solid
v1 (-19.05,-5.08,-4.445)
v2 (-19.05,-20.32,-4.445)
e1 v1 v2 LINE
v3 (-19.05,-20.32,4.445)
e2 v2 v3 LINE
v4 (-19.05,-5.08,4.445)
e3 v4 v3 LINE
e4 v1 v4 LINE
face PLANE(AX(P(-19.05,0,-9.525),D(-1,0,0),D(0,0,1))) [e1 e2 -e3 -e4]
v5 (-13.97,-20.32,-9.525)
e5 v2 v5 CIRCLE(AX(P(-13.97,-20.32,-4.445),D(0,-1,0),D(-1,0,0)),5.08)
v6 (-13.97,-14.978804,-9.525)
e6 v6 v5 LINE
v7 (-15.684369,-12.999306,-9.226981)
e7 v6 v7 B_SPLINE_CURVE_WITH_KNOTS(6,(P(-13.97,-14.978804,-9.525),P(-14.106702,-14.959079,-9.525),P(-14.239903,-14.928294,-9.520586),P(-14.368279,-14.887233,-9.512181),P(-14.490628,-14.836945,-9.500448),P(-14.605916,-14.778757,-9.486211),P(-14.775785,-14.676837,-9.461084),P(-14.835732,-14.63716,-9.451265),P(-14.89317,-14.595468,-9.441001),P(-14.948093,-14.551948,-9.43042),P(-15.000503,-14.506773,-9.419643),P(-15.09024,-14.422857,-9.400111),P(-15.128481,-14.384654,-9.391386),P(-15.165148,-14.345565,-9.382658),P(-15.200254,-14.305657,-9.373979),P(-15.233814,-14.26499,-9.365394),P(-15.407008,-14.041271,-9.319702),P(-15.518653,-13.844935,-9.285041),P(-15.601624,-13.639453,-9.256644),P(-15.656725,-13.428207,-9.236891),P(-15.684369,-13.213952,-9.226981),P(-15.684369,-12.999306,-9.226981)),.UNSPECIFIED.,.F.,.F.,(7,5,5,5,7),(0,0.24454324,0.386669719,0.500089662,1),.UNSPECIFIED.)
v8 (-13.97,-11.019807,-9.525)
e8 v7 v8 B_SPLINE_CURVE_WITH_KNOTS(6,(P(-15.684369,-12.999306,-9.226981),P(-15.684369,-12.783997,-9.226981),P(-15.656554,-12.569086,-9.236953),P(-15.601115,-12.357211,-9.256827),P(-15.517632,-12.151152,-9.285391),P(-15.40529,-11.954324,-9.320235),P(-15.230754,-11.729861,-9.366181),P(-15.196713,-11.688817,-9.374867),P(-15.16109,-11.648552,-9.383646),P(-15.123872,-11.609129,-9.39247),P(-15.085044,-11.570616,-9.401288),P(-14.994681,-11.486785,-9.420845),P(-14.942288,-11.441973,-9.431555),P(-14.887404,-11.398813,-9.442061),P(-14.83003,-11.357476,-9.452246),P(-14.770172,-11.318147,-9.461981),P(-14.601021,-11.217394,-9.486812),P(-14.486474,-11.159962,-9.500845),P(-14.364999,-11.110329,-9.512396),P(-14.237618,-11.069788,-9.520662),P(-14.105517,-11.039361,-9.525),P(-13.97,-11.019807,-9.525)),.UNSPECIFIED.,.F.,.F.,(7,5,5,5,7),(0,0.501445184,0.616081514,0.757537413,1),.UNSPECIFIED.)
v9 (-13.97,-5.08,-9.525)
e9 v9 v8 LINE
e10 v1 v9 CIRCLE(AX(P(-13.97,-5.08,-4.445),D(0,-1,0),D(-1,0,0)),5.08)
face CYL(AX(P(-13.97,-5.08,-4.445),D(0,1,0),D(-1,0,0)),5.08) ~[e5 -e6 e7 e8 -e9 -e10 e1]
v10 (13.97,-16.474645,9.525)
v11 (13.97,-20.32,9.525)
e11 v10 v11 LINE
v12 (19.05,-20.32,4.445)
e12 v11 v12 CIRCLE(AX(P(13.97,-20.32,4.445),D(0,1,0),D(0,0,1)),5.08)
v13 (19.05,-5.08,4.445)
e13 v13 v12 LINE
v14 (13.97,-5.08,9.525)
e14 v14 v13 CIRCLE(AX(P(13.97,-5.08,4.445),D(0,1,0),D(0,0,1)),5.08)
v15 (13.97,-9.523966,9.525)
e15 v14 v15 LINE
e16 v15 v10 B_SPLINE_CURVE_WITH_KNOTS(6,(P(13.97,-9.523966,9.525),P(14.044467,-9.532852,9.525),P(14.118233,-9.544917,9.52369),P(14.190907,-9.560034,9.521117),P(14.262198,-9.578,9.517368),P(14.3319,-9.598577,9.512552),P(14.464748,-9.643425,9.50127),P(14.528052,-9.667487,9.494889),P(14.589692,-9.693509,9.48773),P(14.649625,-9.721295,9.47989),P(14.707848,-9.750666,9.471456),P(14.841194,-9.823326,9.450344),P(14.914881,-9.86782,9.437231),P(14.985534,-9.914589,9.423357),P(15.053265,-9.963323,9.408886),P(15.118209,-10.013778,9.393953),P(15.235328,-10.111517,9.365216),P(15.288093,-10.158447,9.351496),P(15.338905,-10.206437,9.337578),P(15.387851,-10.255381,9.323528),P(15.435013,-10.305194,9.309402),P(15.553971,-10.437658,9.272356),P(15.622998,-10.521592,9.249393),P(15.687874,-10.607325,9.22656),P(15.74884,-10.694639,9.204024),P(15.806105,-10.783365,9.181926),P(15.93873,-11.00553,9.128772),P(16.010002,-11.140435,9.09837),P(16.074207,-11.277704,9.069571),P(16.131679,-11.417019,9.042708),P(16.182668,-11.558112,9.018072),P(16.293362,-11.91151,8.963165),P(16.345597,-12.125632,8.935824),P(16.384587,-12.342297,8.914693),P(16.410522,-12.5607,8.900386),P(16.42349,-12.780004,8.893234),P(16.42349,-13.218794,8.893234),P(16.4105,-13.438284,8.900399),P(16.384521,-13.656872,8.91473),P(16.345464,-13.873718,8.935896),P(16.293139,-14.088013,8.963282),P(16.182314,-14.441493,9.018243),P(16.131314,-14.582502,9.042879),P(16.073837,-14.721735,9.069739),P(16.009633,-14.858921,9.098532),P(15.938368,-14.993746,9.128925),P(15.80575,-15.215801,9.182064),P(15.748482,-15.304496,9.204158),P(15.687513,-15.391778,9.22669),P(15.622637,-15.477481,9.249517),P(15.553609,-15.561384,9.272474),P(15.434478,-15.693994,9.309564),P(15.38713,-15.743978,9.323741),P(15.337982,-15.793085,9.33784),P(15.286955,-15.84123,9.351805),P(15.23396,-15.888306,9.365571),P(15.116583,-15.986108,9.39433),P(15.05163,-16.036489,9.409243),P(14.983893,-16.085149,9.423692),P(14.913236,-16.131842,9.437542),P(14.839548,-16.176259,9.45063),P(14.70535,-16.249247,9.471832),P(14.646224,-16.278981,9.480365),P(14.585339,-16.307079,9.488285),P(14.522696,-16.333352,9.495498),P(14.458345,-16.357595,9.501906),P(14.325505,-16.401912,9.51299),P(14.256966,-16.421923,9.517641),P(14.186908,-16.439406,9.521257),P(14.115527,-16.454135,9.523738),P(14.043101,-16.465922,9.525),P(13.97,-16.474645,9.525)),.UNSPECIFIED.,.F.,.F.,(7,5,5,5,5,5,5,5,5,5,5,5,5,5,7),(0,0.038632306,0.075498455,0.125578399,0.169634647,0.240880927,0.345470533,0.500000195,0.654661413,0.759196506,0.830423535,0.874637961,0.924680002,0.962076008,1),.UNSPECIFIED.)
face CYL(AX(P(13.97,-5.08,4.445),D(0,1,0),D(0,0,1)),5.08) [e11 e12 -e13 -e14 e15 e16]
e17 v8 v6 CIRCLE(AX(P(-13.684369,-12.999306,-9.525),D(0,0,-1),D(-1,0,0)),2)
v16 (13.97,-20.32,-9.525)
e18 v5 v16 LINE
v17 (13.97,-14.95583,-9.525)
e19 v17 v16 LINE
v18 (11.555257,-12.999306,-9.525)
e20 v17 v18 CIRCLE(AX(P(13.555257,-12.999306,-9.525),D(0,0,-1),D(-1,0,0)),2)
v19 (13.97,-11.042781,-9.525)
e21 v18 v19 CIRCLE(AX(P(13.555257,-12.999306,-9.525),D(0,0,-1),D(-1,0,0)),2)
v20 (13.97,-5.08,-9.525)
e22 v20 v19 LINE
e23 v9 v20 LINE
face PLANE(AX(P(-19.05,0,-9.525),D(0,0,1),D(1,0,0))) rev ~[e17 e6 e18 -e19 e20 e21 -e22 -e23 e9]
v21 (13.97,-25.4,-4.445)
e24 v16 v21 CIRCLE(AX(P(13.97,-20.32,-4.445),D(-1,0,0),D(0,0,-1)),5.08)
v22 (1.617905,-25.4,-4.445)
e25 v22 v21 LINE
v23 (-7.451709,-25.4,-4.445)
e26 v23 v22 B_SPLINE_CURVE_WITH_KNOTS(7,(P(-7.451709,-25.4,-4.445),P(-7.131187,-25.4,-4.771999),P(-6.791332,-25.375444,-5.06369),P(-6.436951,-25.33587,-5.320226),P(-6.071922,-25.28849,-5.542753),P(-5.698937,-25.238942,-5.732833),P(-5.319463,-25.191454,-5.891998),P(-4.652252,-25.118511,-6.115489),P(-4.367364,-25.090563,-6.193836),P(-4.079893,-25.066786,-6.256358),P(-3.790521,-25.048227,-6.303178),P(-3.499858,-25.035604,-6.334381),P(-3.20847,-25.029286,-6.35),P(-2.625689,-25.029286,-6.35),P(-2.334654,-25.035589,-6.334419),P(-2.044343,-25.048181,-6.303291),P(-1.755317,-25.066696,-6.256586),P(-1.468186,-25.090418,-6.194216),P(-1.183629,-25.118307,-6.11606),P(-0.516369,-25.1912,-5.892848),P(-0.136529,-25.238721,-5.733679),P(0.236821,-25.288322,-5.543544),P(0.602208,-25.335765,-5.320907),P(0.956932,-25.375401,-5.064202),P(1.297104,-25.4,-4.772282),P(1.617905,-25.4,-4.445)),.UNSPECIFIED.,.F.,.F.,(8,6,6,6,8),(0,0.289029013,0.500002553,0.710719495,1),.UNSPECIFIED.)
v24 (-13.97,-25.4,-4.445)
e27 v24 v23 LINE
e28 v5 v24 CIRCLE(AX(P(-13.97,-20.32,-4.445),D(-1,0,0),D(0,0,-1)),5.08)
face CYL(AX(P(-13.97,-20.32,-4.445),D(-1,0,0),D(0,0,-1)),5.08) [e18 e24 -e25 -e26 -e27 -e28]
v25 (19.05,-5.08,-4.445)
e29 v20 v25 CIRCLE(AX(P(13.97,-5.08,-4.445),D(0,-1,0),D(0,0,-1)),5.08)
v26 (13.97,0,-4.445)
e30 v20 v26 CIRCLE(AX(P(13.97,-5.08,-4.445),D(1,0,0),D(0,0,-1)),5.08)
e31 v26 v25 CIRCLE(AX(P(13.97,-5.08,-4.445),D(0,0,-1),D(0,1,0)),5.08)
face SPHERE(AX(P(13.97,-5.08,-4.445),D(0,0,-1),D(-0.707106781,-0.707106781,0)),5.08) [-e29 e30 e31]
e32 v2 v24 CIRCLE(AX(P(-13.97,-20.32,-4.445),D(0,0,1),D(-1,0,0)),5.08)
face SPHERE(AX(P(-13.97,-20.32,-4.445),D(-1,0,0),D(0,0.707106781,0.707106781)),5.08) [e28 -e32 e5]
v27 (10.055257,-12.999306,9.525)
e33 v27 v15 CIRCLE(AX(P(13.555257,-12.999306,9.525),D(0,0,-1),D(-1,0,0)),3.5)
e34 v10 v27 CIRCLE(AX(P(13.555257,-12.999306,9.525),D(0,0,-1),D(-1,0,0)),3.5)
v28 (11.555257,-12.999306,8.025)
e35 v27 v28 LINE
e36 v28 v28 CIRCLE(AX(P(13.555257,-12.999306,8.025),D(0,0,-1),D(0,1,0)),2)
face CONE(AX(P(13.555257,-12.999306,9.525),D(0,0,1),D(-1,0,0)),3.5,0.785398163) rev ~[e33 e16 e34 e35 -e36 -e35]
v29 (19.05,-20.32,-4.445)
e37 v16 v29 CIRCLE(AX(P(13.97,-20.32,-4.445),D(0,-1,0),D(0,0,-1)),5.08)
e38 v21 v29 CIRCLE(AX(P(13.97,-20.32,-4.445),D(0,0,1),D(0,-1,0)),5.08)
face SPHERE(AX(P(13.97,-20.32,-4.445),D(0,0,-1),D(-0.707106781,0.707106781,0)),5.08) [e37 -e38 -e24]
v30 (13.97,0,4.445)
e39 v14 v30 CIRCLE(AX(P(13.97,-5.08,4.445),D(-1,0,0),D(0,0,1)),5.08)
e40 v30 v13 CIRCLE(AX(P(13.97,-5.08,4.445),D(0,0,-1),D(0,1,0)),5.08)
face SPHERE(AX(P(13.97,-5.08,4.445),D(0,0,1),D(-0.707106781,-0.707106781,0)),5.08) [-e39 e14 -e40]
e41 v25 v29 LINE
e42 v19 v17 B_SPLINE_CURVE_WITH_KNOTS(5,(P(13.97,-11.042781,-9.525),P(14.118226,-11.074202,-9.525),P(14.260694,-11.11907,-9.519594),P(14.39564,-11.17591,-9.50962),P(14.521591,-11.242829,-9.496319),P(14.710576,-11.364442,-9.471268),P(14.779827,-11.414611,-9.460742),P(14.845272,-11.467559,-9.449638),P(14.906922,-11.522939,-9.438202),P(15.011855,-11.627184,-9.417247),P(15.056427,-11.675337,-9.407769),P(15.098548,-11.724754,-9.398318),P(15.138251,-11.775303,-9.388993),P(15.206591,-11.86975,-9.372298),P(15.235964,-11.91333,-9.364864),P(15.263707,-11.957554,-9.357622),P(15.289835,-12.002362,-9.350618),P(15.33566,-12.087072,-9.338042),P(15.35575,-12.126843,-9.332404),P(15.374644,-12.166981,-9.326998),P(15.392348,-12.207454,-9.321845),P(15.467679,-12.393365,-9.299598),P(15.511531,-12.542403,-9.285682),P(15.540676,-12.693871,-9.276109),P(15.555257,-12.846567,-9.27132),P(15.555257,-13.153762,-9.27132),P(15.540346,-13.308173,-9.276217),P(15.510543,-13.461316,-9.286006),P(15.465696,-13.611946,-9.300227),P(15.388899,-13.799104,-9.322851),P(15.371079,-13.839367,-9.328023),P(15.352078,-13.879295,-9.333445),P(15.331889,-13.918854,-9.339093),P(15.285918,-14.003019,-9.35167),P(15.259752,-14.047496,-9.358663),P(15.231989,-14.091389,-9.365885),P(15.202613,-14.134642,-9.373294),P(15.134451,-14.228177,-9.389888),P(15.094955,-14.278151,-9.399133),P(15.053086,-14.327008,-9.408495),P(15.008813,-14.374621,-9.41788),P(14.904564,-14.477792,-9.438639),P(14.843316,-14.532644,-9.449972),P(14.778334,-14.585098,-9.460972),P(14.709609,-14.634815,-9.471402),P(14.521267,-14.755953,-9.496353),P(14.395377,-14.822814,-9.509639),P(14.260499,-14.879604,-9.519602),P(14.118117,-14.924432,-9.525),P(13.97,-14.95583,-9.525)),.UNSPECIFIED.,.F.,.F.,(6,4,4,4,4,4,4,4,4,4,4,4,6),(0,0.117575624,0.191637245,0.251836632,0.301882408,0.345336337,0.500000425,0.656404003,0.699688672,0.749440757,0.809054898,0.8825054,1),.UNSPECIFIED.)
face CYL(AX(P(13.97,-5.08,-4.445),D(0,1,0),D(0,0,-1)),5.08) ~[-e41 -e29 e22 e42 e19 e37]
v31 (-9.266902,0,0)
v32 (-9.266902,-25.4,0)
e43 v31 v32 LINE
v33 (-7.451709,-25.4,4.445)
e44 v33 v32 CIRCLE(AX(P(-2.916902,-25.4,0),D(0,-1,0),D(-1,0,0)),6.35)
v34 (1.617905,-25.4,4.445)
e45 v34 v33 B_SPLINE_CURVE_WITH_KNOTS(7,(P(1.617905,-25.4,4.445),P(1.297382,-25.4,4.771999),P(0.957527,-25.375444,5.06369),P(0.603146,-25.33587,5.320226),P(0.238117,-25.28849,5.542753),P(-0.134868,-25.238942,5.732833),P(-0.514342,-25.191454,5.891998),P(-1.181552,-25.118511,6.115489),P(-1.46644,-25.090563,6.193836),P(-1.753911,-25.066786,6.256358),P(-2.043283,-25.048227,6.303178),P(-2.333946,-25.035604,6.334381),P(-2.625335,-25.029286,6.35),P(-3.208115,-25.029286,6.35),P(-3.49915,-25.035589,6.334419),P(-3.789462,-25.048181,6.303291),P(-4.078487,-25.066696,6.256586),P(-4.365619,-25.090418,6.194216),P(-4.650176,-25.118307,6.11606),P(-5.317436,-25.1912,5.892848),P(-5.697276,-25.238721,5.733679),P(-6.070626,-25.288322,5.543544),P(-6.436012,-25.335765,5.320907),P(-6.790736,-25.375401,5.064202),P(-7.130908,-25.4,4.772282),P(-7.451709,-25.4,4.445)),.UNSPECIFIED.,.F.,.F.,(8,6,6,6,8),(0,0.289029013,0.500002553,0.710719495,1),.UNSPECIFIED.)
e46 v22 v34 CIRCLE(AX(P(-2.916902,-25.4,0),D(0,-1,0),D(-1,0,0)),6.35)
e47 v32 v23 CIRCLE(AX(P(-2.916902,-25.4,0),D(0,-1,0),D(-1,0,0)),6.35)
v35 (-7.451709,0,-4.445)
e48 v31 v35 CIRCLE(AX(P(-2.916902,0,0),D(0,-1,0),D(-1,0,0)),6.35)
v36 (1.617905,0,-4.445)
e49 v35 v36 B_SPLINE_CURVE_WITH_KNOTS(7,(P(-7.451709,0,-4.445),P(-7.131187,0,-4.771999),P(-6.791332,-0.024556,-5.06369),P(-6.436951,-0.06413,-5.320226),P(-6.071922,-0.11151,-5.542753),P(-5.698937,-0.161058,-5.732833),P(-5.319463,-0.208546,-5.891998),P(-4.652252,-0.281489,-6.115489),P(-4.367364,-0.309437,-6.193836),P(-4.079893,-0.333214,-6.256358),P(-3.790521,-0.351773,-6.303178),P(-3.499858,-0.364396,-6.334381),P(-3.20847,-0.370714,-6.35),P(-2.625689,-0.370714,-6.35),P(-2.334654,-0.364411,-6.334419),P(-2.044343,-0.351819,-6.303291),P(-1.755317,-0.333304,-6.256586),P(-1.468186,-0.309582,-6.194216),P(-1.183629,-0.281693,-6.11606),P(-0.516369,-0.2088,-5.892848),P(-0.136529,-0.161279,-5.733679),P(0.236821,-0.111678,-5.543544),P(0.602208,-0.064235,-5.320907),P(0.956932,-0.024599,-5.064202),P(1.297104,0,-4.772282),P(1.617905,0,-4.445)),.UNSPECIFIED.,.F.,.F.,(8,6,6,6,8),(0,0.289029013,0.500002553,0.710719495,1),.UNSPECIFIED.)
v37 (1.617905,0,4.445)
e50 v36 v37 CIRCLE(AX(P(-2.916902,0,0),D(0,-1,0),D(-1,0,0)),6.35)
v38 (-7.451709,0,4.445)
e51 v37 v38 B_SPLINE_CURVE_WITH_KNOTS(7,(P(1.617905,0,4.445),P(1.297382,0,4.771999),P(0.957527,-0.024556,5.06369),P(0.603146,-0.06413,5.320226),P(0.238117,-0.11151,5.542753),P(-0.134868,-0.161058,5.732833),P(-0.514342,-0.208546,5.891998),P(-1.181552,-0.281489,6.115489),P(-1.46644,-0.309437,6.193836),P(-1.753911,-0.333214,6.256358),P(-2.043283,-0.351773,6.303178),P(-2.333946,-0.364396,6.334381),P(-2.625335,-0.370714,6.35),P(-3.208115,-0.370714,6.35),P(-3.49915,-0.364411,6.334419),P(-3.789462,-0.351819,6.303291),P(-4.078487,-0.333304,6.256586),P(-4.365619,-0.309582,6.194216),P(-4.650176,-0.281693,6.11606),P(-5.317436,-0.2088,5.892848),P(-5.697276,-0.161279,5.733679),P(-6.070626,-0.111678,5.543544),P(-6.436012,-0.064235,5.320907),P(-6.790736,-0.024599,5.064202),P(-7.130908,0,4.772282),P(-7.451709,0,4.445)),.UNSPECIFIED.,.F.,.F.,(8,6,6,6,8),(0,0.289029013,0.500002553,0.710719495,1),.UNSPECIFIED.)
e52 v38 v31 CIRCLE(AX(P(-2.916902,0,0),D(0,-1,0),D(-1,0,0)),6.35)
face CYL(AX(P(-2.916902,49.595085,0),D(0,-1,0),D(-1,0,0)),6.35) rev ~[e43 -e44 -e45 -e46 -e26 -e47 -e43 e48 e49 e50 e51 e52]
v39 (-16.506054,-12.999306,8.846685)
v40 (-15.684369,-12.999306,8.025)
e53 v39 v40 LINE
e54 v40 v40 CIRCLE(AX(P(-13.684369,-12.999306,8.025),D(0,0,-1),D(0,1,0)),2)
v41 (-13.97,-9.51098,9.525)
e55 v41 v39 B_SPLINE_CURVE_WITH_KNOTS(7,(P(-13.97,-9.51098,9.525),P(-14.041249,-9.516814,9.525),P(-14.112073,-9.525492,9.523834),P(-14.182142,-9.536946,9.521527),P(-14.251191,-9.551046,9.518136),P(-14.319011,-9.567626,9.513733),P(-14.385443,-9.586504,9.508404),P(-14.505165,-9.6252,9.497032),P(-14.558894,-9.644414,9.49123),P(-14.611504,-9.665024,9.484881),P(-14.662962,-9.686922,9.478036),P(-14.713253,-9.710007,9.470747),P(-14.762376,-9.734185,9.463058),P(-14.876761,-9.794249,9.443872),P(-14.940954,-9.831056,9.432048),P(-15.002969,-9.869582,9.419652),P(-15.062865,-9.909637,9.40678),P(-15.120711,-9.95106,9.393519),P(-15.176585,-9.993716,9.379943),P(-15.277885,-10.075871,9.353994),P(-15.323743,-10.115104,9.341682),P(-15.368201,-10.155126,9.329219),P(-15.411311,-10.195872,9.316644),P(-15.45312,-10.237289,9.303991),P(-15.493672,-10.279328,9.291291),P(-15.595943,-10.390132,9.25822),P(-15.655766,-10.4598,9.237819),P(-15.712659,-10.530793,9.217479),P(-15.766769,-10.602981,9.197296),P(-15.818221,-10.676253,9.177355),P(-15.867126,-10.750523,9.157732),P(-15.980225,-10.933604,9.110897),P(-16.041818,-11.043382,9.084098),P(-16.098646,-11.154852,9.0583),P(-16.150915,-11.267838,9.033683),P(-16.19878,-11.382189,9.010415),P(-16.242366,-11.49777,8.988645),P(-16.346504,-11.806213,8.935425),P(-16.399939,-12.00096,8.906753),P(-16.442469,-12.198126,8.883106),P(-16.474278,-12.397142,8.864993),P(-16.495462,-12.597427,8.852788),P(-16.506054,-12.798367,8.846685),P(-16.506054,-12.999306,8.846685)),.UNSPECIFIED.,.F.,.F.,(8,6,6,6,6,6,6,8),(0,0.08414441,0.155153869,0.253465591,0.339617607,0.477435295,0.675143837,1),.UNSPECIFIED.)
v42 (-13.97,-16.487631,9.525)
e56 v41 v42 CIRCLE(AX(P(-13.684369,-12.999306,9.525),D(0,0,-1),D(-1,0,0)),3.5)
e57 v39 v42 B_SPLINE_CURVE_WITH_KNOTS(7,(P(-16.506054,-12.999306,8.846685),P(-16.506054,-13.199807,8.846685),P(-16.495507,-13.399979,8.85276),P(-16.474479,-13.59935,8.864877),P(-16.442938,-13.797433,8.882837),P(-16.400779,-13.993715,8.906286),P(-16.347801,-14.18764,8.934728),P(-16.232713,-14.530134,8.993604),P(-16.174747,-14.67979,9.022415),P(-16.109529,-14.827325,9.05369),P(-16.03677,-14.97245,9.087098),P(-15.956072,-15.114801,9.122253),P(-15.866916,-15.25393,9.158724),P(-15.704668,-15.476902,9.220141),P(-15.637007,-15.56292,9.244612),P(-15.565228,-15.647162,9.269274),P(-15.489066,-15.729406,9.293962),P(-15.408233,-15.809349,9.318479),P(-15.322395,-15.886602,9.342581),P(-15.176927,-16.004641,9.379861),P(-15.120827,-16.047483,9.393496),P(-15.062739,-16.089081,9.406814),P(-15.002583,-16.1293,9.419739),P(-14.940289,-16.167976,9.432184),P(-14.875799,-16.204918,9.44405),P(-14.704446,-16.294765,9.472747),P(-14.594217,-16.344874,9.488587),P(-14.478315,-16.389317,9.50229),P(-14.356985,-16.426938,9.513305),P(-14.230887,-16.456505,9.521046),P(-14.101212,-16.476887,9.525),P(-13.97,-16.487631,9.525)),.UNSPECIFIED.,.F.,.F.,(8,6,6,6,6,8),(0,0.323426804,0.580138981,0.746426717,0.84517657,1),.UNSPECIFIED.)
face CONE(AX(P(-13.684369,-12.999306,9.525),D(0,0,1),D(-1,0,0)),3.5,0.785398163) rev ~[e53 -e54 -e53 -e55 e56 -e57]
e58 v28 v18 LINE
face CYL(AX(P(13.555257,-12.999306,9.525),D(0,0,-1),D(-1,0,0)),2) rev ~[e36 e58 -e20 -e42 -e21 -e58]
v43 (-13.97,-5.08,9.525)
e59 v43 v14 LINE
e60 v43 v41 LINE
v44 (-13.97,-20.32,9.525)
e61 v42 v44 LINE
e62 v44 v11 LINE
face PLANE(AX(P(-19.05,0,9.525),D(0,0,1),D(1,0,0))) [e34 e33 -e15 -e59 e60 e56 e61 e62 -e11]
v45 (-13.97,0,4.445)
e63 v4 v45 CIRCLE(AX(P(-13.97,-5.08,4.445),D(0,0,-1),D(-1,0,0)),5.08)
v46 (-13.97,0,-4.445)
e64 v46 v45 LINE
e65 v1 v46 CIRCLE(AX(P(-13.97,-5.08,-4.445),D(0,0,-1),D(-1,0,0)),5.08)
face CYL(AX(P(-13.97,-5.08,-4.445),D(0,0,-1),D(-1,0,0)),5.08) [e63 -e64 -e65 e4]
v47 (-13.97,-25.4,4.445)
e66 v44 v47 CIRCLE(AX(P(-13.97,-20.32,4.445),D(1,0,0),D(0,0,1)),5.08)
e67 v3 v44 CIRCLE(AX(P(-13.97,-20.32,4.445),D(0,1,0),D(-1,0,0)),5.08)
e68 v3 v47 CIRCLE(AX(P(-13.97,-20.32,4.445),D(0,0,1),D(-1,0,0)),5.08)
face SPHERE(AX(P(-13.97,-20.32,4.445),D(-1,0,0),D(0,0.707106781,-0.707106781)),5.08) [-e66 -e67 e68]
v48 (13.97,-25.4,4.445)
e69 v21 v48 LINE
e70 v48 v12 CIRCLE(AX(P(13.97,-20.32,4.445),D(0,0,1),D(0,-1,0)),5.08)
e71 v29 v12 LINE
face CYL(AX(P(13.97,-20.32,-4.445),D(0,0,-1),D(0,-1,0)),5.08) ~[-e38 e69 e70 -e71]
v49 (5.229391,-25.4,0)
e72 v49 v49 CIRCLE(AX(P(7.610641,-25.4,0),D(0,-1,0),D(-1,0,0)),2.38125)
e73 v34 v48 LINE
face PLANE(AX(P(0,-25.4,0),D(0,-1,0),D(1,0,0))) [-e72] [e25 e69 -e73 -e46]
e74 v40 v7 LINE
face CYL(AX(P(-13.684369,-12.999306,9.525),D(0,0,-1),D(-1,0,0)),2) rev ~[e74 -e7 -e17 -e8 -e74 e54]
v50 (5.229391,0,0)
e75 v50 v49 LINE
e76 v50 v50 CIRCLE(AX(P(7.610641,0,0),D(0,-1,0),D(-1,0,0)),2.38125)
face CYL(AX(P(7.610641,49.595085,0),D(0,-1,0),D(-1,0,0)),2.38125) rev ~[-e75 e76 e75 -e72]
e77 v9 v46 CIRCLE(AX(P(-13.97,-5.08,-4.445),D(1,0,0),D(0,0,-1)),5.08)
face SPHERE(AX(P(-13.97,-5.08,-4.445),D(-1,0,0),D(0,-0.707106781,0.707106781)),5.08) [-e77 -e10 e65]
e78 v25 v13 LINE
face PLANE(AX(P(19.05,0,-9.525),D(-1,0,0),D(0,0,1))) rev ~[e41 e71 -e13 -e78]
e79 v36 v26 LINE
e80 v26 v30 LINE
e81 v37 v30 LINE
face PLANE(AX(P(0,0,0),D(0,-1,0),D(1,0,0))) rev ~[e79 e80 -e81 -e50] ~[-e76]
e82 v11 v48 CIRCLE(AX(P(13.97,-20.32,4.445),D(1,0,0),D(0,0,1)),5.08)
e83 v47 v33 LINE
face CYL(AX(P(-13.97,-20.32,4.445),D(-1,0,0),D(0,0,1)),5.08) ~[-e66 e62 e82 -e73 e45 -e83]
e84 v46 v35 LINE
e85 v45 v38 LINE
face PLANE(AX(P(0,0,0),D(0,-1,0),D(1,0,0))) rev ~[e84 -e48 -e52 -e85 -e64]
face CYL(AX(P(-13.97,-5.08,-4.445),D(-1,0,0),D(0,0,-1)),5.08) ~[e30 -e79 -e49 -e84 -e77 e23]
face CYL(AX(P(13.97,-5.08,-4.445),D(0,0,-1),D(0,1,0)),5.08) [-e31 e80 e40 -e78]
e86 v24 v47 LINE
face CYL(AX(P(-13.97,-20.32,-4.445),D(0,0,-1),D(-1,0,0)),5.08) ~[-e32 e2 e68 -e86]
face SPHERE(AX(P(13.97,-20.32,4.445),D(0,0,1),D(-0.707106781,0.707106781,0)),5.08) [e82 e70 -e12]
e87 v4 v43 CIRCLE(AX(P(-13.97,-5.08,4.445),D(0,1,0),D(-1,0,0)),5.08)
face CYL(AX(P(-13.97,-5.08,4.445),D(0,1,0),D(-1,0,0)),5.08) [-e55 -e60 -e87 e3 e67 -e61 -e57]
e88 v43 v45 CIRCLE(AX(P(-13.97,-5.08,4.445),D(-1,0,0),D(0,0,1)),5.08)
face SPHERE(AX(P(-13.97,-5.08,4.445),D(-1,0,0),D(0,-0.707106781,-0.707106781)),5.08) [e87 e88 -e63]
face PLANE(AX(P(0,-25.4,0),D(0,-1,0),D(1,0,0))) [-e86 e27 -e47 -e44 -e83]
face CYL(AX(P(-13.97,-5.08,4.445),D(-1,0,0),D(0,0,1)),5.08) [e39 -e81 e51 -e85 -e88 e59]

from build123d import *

# Parameters (mm, degrees)
F0_W           = 38.1
F0_H           = 19.05
F1_DEPTH       = 25.4
F2_D           = 12.7
F3_D           = 4.7625
F5_D           = 4
F5_CSINK_D     = 7
F5_CSINK_ANGLE = 90
F6_T1_DEPTH    = 27.94
F6_T3_DEPTH    = 15.24
F6_T5_DEPTH    = 8.89
F6_S9_W        = 5.08
F6_S9_H        = 5.08
F6_T10_DEPTH   = 5.08
F6_S15_W       = 5.08
F6_S15_H       = 5.08
F6_T16_DEPTH   = 5.08
F6_S21_W       = 5.08
F6_S21_H       = 5.08
F6_T22_DEPTH   = 5.08
F6_S27_W       = 5.08
F6_S27_H       = 5.08
F6_T28_DEPTH   = 5.08
F6_S33_W       = 5.08
F6_S33_H       = 5.08
F6_T34_DEPTH   = 5.08
F6_S39_W       = 5.08
F6_S39_H       = 5.08
F6_T40_DEPTH   = 5.08
F6_S45_W       = 5.08
F6_S45_H       = 5.08
F6_T46_DEPTH   = 5.08
F6_S51_W       = 5.08
F6_S51_H       = 5.08
F6_T52_DEPTH   = 5.08


# Not quite as in the source:
# - a fillet or chamfer that OpenCascade refuses, or shapes differently, is made with other operations: its cross-section is extruded or revolved along the edge and cut away or added


with BuildPart() as f1:
    # F0 (on Front) → F1 (new body)
    with BuildSketch(Plane.XZ):
        Rectangle(F0_W, F0_H)
    extrude(amount=F1_DEPTH)

    # F2 (through all)
    with Locations(Plane(origin=(0, 0, 0), x_dir=(1, 0, 0), z_dir=(0, 1, 0))):
        with Locations((-2.9169023037, 0)):
            Hole(F2_D / 2)

    # F3 (through all)
    with Locations(Plane(origin=(0, 0, 0), x_dir=(1, 0, 0), z_dir=(0, 1, 0))):
        with Locations((7.6106409542, 0)):
            Hole(F3_D / 2)

    # F5 (through all)
    with Locations(Plane.XY.offset(9.525)):
        with Locations((-13.6843686923, -12.9993055016), (13.5552566499, -12.9993055016)):
            CounterSinkHole(F5_D / 2, F5_CSINK_D / 2, counter_sink_angle=F5_CSINK_ANGLE)

    # F6: fillet of radius 5.08 on 12 edges, made by hand

    # F6_s2 → F6_t1 (cut)
    with BuildSketch(Plane.YZ.offset(-13.97)):
        with BuildLine():
            ThreePointArc((-5.08, 9.525), (-1.4878975516, 8.0371024484), (0, 4.445))
            Line((0, 4.445), (0, 9.525))
            Line((0, 9.525), (-5.08, 9.525))
        make_face()
        with BuildLine():
            ThreePointArc((-20.32, 9.525), (-23.9121024484, 8.0371024484), (-25.4, 4.445))
            Line((-25.4, 4.445), (-25.4, 9.525))
            Line((-25.4, 9.525), (-20.32, 9.525))
        make_face()
        with BuildLine():
            ThreePointArc((-20.32, -9.525), (-23.9121024484, -8.0371024484), (-25.4, -4.445))
            Line((-25.4, -4.445), (-25.4, -9.525))
            Line((-25.4, -9.525), (-20.32, -9.525))
        make_face()
        with BuildLine():
            ThreePointArc((-5.08, -9.525), (-1.4878975516, -8.0371024484), (0, -4.445))
            Line((0, -4.445), (0, -9.525))
            Line((0, -9.525), (-5.08, -9.525))
        make_face()
    extrude(amount=F6_T1_DEPTH, mode=Mode.SUBTRACT)

    # F6_s4 → F6_t3 (cut)
    with BuildSketch(Plane.XZ.offset(5.08)):
        with BuildLine():
            ThreePointArc((13.97, -9.525), (17.5621024484, -8.0371024484), (19.05, -4.445))
            Line((19.05, -4.445), (19.05, -9.525))
            Line((19.05, -9.525), (13.97, -9.525))
        make_face()
        with BuildLine():
            ThreePointArc((13.97, 9.525), (17.5621024484, 8.0371024484), (19.05, 4.445))
            Line((19.05, 4.445), (19.05, 9.525))
            Line((19.05, 9.525), (13.97, 9.525))
        make_face()
        with BuildLine():
            ThreePointArc((-19.05, 4.445), (-17.5621024484, 8.0371024484), (-13.97, 9.525))
            Line((-13.97, 9.525), (-19.05, 9.525))
            Line((-19.05, 9.525), (-19.05, 4.445))
        make_face()
        with BuildLine():
            ThreePointArc((-19.05, -4.445), (-17.5621024484, -8.0371024484), (-13.97, -9.525))
            Line((-13.97, -9.525), (-19.05, -9.525))
            Line((-19.05, -9.525), (-19.05, -4.445))
        make_face()
    extrude(amount=F6_T3_DEPTH, mode=Mode.SUBTRACT)

    # F6_s6 → F6_t5 (cut)
    with BuildSketch(Plane.XY.offset(-4.445)):
        with BuildLine():
            ThreePointArc((13.97, 0), (17.5621024484, -1.4878975516), (19.05, -5.08))
            Line((19.05, -5.08), (19.05, 0))
            Line((19.05, 0), (13.97, 0))
        make_face()
        with BuildLine():
            ThreePointArc((13.97, -25.4), (17.5621024484, -23.9121024484), (19.05, -20.32))
            Line((19.05, -20.32), (19.05, -25.4))
            Line((19.05, -25.4), (13.97, -25.4))
        make_face()
        with BuildLine():
            ThreePointArc((-19.05, -5.08), (-17.5621024484, -1.4878975516), (-13.97, 0))
            Line((-13.97, 0), (-19.05, 0))
            Line((-19.05, 0), (-19.05, -5.08))
        make_face()
        with BuildLine():
            ThreePointArc((-19.05, -20.32), (-17.5621024484, -23.9121024484), (-13.97, -25.4))
            Line((-13.97, -25.4), (-19.05, -25.4))
            Line((-19.05, -25.4), (-19.05, -20.32))
        make_face()
    extrude(amount=F6_T5_DEPTH, mode=Mode.SUBTRACT)


with BuildPart() as f6_tool8:
    # F6_s9 → F6_t10 (new body)
    with BuildSketch(Plane.XY.offset(4.445)):
        with Locations((16.51, -2.54)):
            Rectangle(F6_S9_W, F6_S9_H)
    extrude(amount=F6_T10_DEPTH)

    # F6_s11 → F6_t12 (revolve, cut)
    with BuildSketch(Plane(origin=(13.97, -5.08, 4.445), x_dir=(-0.7071067812, -0.7071067812, 0), z_dir=(-0.7071067812, 0.7071067812, 0))):
        with BuildLine():
            ThreePointArc((0, -5.08), (5.08, 0), (0, 5.08))
            Line((0, 5.08), (0, -5.08))
        make_face()
    revolve(axis=Axis((13.97, -5.08, 4.445), (0, 0, 1)), mode=Mode.SUBTRACT)


with BuildPart() as f1_1:
    add(f1.part)

    # F6_t7: cut F6_tool8
    add(f6_tool8.part, mode=Mode.SUBTRACT)


with BuildPart() as f6_tool14:
    # F6_s15 → F6_t16 (new body)
    with BuildSketch(Plane.YZ.offset(-13.97)):
        with Locations((-2.54, 6.985)):
            Rectangle(F6_S15_W, F6_S15_H)
    extrude(amount=-F6_T16_DEPTH)

    # F6_s17 → F6_t18 (revolve, cut)
    with BuildSketch(Plane(origin=(-13.97, -5.08, 4.445), x_dir=(0, -0.7071067812, -0.7071067812), z_dir=(0, 0.7071067812, -0.7071067812))):
        with BuildLine():
            ThreePointArc((0, -5.08), (5.08, 0), (0, 5.08))
            Line((0, 5.08), (0, -5.08))
        make_face()
    revolve(axis=Axis((-13.97, -5.08, 4.445), (-1, 0, 0)), mode=Mode.SUBTRACT)


with BuildPart() as f1_2:
    add(f1_1.part)

    # F6_t13: cut F6_tool14
    add(f6_tool14.part, mode=Mode.SUBTRACT)


with BuildPart() as f6_tool20:
    # F6_s21 → F6_t22 (new body)
    with BuildSketch(Plane.XY.offset(4.445)):
        with Locations((16.51, -22.86)):
            Rectangle(F6_S21_W, F6_S21_H)
    extrude(amount=F6_T22_DEPTH)

    # F6_s23 → F6_t24 (revolve, cut)
    with BuildSketch(Plane(origin=(13.97, -20.32, 4.445), x_dir=(-0.7071067812, 0.7071067812, 0), z_dir=(0.7071067812, 0.7071067812, 0))):
        with BuildLine():
            ThreePointArc((0, -5.08), (5.08, 0), (0, 5.08))
            Line((0, 5.08), (0, -5.08))
        make_face()
    revolve(axis=Axis((13.97, -20.32, 4.445), (0, 0, 1)), mode=Mode.SUBTRACT)


with BuildPart() as f1_3:
    add(f1_2.part)

    # F6_t19: cut F6_tool20
    add(f6_tool20.part, mode=Mode.SUBTRACT)


with BuildPart() as f6_tool26:
    # F6_s27 → F6_t28 (new body)
    with BuildSketch(Plane.YZ.offset(-13.97)):
        with Locations((-22.86, 6.985)):
            Rectangle(F6_S27_W, F6_S27_H)
    extrude(amount=-F6_T28_DEPTH)

    # F6_s29 → F6_t30 (revolve, cut)
    with BuildSketch(Plane(origin=(-13.97, -20.32, 4.445), x_dir=(0, 0.7071067812, -0.7071067812), z_dir=(0, 0.7071067812, 0.7071067812))):
        with BuildLine():
            ThreePointArc((0, -5.08), (5.08, 0), (0, 5.08))
            Line((0, 5.08), (0, -5.08))
        make_face()
    revolve(axis=Axis((-13.97, -20.32, 4.445), (-1, 0, 0)), mode=Mode.SUBTRACT)


with BuildPart() as f1_4:
    add(f1_3.part)

    # F6_t25: cut F6_tool26
    add(f6_tool26.part, mode=Mode.SUBTRACT)


with BuildPart() as f6_tool32:
    # F6_s33 → F6_t34 (new body)
    with BuildSketch(Plane.YZ.offset(-13.97)):
        with Locations((-22.86, -6.985)):
            Rectangle(F6_S33_W, F6_S33_H)
    extrude(amount=-F6_T34_DEPTH)

    # F6_s35 → F6_t36 (revolve, cut)
    with BuildSketch(Plane(origin=(-13.97, -20.32, -4.445), x_dir=(0, 0.7071067812, 0.7071067812), z_dir=(0, -0.7071067812, 0.7071067812))):
        with BuildLine():
            ThreePointArc((0, -5.08), (5.08, 0), (0, 5.08))
            Line((0, 5.08), (0, -5.08))
        make_face()
    revolve(axis=Axis((-13.97, -20.32, -4.445), (-1, 0, 0)), mode=Mode.SUBTRACT)


with BuildPart() as f1_5:
    add(f1_4.part)

    # F6_t31: cut F6_tool32
    add(f6_tool32.part, mode=Mode.SUBTRACT)


with BuildPart() as f6_tool38:
    # F6_s39 → F6_t40 (new body)
    with BuildSketch(Plane.XY.offset(-4.445)):
        with Locations((16.51, -22.86)):
            Rectangle(F6_S39_W, F6_S39_H)
    extrude(amount=-F6_T40_DEPTH)

    # F6_s41 → F6_t42 (revolve, cut)
    with BuildSketch(Plane(origin=(13.97, -20.32, -4.445), x_dir=(-0.7071067812, 0.7071067812, 0), z_dir=(-0.7071067812, -0.7071067812, 0))):
        with BuildLine():
            ThreePointArc((0, -5.08), (5.08, 0), (0, 5.08))
            Line((0, 5.08), (0, -5.08))
        make_face()
    revolve(axis=Axis((13.97, -20.32, -4.445), (0, 0, -1)), mode=Mode.SUBTRACT)


with BuildPart() as f1_6:
    add(f1_5.part)

    # F6_t37: cut F6_tool38
    add(f6_tool38.part, mode=Mode.SUBTRACT)


with BuildPart() as f6_tool44:
    # F6_s45 → F6_t46 (new body)
    with BuildSketch(Plane.YZ.offset(-13.97)):
        with Locations((-2.54, -6.985)):
            Rectangle(F6_S45_W, F6_S45_H)
    extrude(amount=-F6_T46_DEPTH)

    # F6_s47 → F6_t48 (revolve, cut)
    with BuildSketch(Plane(origin=(-13.97, -5.08, -4.445), x_dir=(0, -0.7071067812, 0.7071067812), z_dir=(0, -0.7071067812, -0.7071067812))):
        with BuildLine():
            ThreePointArc((0, -5.08), (5.08, 0), (0, 5.08))
            Line((0, 5.08), (0, -5.08))
        make_face()
    revolve(axis=Axis((-13.97, -5.08, -4.445), (-1, 0, 0)), mode=Mode.SUBTRACT)


with BuildPart() as f1_7:
    add(f1_6.part)

    # F6_t43: cut F6_tool44
    add(f6_tool44.part, mode=Mode.SUBTRACT)


with BuildPart() as f6_tool50:
    # F6_s51 → F6_t52 (new body)
    with BuildSketch(Plane.XY.offset(-4.445)):
        with Locations((16.51, -2.54)):
            Rectangle(F6_S51_W, F6_S51_H)
    extrude(amount=-F6_T52_DEPTH)

    # F6_s53 → F6_t54 (revolve, cut)
    with BuildSketch(Plane(origin=(13.97, -5.08, -4.445), x_dir=(-0.7071067812, -0.7071067812, 0), z_dir=(0.7071067812, -0.7071067812, 0))):
        with BuildLine():
            ThreePointArc((0, -5.08), (5.08, 0), (0, 5.08))
            Line((0, 5.08), (0, -5.08))
        make_face()
    revolve(axis=Axis((13.97, -5.08, -4.445), (0, 0, -1)), mode=Mode.SUBTRACT)


with BuildPart() as f1_8:
    add(f1_7.part)

    # F6_t49: cut F6_tool50
    add(f6_tool50.part, mode=Mode.SUBTRACT)


solid = f1_8.part
